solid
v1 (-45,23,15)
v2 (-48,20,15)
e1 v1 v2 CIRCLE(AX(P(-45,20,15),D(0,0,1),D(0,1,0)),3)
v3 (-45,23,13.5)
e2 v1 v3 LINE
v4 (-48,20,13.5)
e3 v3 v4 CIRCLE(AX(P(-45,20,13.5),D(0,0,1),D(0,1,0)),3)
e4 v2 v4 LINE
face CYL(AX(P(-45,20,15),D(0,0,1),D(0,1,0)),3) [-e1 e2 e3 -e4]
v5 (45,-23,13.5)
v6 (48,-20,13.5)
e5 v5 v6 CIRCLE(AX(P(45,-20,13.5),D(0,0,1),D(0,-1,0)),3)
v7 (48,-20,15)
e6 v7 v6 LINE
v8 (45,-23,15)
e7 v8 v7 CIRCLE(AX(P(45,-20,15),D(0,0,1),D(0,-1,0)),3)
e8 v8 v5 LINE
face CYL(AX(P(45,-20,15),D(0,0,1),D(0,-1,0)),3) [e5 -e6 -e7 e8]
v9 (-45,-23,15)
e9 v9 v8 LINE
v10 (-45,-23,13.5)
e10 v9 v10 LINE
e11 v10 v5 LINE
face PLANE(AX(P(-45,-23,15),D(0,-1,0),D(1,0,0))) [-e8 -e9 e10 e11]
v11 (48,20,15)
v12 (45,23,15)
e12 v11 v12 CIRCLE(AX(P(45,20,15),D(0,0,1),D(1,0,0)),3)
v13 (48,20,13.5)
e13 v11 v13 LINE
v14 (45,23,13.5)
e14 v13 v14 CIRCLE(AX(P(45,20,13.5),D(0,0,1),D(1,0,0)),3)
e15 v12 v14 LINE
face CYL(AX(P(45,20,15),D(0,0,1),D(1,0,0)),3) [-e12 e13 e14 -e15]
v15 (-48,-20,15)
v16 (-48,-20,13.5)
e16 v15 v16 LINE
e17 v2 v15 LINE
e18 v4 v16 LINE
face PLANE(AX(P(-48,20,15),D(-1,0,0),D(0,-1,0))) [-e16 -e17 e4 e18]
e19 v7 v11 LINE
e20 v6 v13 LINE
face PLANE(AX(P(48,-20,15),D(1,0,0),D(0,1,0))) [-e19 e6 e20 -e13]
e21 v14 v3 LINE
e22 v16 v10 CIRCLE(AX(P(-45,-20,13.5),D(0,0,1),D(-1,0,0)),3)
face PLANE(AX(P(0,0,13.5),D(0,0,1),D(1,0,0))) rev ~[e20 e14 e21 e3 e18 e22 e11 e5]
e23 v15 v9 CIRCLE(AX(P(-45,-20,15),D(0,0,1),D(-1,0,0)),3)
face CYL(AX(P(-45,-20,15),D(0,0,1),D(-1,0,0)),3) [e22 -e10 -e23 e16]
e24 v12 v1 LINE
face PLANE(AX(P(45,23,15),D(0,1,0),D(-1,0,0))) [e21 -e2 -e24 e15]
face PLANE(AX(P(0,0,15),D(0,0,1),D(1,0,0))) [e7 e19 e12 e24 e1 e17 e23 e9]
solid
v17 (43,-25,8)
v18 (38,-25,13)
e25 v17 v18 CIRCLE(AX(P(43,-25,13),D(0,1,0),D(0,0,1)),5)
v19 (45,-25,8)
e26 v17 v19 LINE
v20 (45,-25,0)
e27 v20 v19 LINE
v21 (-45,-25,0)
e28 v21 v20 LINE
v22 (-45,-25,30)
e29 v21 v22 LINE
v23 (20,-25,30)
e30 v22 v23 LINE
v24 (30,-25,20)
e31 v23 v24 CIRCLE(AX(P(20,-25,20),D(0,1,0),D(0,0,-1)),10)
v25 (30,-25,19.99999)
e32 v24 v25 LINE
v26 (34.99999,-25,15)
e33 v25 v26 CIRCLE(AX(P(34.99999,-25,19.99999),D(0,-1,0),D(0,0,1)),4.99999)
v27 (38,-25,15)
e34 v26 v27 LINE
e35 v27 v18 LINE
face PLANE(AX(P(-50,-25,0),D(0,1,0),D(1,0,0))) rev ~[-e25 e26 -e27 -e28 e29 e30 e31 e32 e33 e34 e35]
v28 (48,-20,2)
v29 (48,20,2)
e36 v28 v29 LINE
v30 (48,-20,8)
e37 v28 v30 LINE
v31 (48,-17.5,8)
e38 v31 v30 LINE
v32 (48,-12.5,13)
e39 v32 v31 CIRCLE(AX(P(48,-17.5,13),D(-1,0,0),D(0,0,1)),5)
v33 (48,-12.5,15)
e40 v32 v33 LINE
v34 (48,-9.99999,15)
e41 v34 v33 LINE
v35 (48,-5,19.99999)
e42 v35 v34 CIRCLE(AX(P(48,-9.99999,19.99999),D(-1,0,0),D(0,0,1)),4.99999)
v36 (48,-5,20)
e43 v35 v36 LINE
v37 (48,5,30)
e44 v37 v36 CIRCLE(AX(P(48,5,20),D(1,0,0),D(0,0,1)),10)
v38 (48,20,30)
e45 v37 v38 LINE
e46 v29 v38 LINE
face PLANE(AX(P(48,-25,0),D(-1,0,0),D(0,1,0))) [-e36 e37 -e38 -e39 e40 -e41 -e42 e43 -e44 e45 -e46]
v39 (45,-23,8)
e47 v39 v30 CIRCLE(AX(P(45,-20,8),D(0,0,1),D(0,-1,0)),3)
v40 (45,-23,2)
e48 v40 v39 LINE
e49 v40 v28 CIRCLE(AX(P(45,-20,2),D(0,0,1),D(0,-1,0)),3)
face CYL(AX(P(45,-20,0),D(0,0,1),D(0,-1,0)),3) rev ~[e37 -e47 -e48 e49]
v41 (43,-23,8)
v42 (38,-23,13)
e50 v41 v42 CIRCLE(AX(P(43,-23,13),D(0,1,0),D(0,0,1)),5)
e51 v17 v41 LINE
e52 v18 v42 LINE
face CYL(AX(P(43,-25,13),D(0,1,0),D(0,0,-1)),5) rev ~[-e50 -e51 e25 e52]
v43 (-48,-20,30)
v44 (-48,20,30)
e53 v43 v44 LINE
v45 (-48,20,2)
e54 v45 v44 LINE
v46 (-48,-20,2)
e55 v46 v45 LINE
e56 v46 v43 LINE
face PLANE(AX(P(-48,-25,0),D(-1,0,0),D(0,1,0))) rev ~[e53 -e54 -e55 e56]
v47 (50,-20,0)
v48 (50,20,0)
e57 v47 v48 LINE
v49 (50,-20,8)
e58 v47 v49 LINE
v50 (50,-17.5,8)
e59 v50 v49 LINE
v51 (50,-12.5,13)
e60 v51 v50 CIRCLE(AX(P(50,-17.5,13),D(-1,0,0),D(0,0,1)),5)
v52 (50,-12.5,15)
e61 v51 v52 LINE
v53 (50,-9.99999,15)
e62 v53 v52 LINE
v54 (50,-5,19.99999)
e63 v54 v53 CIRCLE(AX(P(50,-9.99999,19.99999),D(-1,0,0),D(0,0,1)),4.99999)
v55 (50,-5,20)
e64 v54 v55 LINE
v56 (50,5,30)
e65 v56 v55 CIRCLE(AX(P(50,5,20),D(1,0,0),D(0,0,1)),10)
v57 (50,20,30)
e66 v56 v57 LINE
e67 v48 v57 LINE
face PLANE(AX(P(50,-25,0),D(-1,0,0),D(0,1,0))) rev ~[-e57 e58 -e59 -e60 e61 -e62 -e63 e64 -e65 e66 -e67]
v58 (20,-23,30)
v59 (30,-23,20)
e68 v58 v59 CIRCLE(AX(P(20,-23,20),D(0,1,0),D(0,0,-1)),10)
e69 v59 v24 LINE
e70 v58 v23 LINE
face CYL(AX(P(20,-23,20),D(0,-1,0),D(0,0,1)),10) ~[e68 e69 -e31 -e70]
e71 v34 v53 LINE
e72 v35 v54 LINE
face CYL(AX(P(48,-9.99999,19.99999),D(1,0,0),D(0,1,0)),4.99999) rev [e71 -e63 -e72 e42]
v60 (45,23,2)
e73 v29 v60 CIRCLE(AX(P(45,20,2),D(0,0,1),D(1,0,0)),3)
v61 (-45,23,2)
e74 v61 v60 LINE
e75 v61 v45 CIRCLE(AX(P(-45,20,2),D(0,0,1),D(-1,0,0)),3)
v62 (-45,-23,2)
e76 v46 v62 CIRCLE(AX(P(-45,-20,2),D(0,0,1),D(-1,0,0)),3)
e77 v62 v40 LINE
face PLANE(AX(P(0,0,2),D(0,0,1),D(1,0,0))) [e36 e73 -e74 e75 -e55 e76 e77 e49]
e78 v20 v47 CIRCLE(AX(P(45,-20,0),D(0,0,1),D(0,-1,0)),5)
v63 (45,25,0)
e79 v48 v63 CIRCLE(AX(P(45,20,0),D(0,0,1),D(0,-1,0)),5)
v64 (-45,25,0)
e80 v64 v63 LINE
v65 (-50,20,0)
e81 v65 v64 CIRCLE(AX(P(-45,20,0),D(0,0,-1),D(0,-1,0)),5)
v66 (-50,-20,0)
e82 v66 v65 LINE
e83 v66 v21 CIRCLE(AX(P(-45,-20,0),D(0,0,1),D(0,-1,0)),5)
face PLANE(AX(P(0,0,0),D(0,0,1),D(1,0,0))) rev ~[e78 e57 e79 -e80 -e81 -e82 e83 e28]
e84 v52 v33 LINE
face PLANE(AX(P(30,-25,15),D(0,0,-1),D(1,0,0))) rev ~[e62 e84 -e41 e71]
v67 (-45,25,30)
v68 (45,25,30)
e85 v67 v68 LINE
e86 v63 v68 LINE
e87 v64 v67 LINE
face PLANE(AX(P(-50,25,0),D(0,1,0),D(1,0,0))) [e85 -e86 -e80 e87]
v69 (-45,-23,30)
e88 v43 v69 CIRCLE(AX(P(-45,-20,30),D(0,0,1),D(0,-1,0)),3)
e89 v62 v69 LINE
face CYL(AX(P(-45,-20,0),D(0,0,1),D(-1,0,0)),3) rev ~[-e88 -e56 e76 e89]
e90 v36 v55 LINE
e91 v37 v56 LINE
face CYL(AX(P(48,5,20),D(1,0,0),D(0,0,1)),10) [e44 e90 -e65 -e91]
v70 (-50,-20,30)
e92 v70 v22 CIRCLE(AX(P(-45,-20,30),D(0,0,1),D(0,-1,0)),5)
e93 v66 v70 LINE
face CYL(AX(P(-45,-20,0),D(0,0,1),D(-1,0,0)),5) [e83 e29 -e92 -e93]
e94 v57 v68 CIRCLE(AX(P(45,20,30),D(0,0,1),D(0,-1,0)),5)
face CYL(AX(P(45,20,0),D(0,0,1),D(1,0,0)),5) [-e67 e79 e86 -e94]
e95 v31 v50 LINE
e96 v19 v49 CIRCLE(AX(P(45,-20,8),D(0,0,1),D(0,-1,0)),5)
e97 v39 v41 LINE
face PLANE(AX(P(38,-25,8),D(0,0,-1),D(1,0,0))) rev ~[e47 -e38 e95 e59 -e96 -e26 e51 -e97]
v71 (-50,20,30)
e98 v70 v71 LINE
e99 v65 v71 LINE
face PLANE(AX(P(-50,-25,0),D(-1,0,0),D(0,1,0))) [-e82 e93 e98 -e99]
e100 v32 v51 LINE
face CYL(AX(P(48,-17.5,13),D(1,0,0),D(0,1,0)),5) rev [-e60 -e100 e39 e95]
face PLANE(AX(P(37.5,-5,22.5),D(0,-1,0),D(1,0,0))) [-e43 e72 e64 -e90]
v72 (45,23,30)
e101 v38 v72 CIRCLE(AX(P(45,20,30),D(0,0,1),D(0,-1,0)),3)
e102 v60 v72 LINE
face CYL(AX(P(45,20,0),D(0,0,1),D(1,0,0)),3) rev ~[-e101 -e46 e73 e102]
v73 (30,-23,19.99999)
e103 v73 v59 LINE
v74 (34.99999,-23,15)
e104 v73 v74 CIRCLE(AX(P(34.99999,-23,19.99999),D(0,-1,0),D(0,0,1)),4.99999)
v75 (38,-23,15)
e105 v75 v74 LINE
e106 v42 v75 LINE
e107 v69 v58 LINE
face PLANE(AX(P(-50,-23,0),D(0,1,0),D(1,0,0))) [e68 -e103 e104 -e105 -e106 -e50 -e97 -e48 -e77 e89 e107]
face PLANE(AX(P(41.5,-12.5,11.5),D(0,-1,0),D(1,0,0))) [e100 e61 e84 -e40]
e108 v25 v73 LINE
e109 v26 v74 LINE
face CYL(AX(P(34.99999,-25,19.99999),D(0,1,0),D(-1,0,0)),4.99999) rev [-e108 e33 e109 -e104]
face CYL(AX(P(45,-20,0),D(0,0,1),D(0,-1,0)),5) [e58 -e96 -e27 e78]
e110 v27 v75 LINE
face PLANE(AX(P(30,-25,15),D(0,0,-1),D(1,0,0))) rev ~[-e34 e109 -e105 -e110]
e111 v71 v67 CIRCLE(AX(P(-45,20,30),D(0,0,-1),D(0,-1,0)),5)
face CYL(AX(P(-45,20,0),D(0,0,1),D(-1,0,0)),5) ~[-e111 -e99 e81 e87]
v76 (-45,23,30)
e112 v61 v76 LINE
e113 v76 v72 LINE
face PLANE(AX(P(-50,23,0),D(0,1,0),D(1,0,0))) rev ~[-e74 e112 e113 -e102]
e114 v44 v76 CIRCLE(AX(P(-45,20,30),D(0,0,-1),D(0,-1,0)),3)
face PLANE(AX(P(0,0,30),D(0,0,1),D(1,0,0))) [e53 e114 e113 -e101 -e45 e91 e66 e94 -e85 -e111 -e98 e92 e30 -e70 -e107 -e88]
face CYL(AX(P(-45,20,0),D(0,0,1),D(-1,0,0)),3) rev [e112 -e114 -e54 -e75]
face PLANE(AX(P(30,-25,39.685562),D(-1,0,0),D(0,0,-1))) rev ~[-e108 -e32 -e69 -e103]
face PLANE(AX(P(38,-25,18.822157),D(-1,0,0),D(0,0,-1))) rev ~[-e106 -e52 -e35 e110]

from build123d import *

# Parameters (mm, degrees)
F0_W      = 100
F0_H      = 50
F1_DEPTH  = 30
F2_R      = 5
F3_T      = -2
F4_W      = 15
F4_H      = 15
F5_DEPTH  = 20
F6_W      = 7
F6_H      = 7
F7_DEPTH  = 12.5
F11_DEPTH = 1.5
F13_R     = 10
F14_R     = 4.99999
F15_R     = 5


# Not quite as in the source:
# - a fillet or chamfer is up to 0.001 mm smaller than in the source, because OpenCascade refuses the exact size
# - a feature of the source that left no trace in its solid (it failed there, or was rolled back) is left out


with BuildPart() as f1:
    # F0 (on Top) → F1 (new body)
    with BuildSketch(Plane.XY):
        Rectangle(F0_W, F0_H)
    extrude(amount=F1_DEPTH)

    # F2
    f2_edges = [f1.edges().sort_by_distance(p)[0] for p in [
        (50, -25, 15),
        (50, 25, 15),
        (-50, -25, 15),
        (-50, 25, 15),
    ]]
    fillet(f2_edges, radius=F2_R)

    # F3
    f3_openings = [f1.faces().sort_by_distance(p)[0] for p in [
        (0, 0, 30),
    ]]
    offset(amount=F3_T, openings=f3_openings)

    # F4 (on face) → F5 (cut)
    with BuildSketch(Plane.XZ.offset(25)):
        with Locations((37.5, 22.5)):
            Rectangle(F4_W, F4_H)
        Polygon((45, 30), (45, 15), (56.0200872774, 15), (56.0200872774, 39.6855616785), (30, 39.6855616785), (30, 30), align=None)
    extrude(amount=-F5_DEPTH, mode=Mode.SUBTRACT)

    # F6 (on face) → F7 (cut)
    with BuildSketch(Plane.XZ.offset(25)):
        with Locations((41.5, 11.5)):
            Rectangle(F6_W, F6_H)
        Polygon((56.9183766905, 18.8221567892), (38, 18.8221567892), (38, 15), (45, 15), (45, 8), (56.9183766905, 8), align=None)
    extrude(amount=-F7_DEPTH, mode=Mode.SUBTRACT)

    # F13
    f13_edges = [f1.edges().sort_by_distance(p)[0] for p in [
        (30, -24, 30),
        (49, -5, 30),
    ]]
    fillet(f13_edges, radius=F13_R)

    # F14 (radius 5 in the source; OpenCascade refuses exactly that, so slightly less here)
    f14_edges = [f1.edges().sort_by_distance(p)[0] for p in [
        (30, -24, 15),
        (49, -5, 15),
    ]]
    fillet(f14_edges, radius=F14_R)

    # F15
    f15_edges = [f1.edges().sort_by_distance(p)[0] for p in [
        (38, -24, 8),
        (49, -12.5, 8),
    ]]
    fillet(f15_edges, radius=F15_R)


with BuildPart() as f11:
    # F10 (on offset) → F11 (new body)
    with BuildSketch(Plane.XY.offset(15)):
        with BuildLine():
            ThreePointArc((-45, 23), (-47.1213203436, 22.1213203436), (-48, 20))
            Line((-48, 20), (-48, -20))
            ThreePointArc((-48, -20), (-47.1213203436, -22.1213203436), (-45, -23))
            Line((-45, -23), (45, -23))
            ThreePointArc((45, -23), (47.1213203436, -22.1213203436), (48, -20))
            Line((48, -20), (48, 20))
            ThreePointArc((48, 20), (47.1213203436, 22.1213203436), (45, 23))
            Line((45, 23), (-45, 23))
        make_face()
    extrude(amount=-F11_DEPTH)


solid = Compound([f1.part, f11.part])
